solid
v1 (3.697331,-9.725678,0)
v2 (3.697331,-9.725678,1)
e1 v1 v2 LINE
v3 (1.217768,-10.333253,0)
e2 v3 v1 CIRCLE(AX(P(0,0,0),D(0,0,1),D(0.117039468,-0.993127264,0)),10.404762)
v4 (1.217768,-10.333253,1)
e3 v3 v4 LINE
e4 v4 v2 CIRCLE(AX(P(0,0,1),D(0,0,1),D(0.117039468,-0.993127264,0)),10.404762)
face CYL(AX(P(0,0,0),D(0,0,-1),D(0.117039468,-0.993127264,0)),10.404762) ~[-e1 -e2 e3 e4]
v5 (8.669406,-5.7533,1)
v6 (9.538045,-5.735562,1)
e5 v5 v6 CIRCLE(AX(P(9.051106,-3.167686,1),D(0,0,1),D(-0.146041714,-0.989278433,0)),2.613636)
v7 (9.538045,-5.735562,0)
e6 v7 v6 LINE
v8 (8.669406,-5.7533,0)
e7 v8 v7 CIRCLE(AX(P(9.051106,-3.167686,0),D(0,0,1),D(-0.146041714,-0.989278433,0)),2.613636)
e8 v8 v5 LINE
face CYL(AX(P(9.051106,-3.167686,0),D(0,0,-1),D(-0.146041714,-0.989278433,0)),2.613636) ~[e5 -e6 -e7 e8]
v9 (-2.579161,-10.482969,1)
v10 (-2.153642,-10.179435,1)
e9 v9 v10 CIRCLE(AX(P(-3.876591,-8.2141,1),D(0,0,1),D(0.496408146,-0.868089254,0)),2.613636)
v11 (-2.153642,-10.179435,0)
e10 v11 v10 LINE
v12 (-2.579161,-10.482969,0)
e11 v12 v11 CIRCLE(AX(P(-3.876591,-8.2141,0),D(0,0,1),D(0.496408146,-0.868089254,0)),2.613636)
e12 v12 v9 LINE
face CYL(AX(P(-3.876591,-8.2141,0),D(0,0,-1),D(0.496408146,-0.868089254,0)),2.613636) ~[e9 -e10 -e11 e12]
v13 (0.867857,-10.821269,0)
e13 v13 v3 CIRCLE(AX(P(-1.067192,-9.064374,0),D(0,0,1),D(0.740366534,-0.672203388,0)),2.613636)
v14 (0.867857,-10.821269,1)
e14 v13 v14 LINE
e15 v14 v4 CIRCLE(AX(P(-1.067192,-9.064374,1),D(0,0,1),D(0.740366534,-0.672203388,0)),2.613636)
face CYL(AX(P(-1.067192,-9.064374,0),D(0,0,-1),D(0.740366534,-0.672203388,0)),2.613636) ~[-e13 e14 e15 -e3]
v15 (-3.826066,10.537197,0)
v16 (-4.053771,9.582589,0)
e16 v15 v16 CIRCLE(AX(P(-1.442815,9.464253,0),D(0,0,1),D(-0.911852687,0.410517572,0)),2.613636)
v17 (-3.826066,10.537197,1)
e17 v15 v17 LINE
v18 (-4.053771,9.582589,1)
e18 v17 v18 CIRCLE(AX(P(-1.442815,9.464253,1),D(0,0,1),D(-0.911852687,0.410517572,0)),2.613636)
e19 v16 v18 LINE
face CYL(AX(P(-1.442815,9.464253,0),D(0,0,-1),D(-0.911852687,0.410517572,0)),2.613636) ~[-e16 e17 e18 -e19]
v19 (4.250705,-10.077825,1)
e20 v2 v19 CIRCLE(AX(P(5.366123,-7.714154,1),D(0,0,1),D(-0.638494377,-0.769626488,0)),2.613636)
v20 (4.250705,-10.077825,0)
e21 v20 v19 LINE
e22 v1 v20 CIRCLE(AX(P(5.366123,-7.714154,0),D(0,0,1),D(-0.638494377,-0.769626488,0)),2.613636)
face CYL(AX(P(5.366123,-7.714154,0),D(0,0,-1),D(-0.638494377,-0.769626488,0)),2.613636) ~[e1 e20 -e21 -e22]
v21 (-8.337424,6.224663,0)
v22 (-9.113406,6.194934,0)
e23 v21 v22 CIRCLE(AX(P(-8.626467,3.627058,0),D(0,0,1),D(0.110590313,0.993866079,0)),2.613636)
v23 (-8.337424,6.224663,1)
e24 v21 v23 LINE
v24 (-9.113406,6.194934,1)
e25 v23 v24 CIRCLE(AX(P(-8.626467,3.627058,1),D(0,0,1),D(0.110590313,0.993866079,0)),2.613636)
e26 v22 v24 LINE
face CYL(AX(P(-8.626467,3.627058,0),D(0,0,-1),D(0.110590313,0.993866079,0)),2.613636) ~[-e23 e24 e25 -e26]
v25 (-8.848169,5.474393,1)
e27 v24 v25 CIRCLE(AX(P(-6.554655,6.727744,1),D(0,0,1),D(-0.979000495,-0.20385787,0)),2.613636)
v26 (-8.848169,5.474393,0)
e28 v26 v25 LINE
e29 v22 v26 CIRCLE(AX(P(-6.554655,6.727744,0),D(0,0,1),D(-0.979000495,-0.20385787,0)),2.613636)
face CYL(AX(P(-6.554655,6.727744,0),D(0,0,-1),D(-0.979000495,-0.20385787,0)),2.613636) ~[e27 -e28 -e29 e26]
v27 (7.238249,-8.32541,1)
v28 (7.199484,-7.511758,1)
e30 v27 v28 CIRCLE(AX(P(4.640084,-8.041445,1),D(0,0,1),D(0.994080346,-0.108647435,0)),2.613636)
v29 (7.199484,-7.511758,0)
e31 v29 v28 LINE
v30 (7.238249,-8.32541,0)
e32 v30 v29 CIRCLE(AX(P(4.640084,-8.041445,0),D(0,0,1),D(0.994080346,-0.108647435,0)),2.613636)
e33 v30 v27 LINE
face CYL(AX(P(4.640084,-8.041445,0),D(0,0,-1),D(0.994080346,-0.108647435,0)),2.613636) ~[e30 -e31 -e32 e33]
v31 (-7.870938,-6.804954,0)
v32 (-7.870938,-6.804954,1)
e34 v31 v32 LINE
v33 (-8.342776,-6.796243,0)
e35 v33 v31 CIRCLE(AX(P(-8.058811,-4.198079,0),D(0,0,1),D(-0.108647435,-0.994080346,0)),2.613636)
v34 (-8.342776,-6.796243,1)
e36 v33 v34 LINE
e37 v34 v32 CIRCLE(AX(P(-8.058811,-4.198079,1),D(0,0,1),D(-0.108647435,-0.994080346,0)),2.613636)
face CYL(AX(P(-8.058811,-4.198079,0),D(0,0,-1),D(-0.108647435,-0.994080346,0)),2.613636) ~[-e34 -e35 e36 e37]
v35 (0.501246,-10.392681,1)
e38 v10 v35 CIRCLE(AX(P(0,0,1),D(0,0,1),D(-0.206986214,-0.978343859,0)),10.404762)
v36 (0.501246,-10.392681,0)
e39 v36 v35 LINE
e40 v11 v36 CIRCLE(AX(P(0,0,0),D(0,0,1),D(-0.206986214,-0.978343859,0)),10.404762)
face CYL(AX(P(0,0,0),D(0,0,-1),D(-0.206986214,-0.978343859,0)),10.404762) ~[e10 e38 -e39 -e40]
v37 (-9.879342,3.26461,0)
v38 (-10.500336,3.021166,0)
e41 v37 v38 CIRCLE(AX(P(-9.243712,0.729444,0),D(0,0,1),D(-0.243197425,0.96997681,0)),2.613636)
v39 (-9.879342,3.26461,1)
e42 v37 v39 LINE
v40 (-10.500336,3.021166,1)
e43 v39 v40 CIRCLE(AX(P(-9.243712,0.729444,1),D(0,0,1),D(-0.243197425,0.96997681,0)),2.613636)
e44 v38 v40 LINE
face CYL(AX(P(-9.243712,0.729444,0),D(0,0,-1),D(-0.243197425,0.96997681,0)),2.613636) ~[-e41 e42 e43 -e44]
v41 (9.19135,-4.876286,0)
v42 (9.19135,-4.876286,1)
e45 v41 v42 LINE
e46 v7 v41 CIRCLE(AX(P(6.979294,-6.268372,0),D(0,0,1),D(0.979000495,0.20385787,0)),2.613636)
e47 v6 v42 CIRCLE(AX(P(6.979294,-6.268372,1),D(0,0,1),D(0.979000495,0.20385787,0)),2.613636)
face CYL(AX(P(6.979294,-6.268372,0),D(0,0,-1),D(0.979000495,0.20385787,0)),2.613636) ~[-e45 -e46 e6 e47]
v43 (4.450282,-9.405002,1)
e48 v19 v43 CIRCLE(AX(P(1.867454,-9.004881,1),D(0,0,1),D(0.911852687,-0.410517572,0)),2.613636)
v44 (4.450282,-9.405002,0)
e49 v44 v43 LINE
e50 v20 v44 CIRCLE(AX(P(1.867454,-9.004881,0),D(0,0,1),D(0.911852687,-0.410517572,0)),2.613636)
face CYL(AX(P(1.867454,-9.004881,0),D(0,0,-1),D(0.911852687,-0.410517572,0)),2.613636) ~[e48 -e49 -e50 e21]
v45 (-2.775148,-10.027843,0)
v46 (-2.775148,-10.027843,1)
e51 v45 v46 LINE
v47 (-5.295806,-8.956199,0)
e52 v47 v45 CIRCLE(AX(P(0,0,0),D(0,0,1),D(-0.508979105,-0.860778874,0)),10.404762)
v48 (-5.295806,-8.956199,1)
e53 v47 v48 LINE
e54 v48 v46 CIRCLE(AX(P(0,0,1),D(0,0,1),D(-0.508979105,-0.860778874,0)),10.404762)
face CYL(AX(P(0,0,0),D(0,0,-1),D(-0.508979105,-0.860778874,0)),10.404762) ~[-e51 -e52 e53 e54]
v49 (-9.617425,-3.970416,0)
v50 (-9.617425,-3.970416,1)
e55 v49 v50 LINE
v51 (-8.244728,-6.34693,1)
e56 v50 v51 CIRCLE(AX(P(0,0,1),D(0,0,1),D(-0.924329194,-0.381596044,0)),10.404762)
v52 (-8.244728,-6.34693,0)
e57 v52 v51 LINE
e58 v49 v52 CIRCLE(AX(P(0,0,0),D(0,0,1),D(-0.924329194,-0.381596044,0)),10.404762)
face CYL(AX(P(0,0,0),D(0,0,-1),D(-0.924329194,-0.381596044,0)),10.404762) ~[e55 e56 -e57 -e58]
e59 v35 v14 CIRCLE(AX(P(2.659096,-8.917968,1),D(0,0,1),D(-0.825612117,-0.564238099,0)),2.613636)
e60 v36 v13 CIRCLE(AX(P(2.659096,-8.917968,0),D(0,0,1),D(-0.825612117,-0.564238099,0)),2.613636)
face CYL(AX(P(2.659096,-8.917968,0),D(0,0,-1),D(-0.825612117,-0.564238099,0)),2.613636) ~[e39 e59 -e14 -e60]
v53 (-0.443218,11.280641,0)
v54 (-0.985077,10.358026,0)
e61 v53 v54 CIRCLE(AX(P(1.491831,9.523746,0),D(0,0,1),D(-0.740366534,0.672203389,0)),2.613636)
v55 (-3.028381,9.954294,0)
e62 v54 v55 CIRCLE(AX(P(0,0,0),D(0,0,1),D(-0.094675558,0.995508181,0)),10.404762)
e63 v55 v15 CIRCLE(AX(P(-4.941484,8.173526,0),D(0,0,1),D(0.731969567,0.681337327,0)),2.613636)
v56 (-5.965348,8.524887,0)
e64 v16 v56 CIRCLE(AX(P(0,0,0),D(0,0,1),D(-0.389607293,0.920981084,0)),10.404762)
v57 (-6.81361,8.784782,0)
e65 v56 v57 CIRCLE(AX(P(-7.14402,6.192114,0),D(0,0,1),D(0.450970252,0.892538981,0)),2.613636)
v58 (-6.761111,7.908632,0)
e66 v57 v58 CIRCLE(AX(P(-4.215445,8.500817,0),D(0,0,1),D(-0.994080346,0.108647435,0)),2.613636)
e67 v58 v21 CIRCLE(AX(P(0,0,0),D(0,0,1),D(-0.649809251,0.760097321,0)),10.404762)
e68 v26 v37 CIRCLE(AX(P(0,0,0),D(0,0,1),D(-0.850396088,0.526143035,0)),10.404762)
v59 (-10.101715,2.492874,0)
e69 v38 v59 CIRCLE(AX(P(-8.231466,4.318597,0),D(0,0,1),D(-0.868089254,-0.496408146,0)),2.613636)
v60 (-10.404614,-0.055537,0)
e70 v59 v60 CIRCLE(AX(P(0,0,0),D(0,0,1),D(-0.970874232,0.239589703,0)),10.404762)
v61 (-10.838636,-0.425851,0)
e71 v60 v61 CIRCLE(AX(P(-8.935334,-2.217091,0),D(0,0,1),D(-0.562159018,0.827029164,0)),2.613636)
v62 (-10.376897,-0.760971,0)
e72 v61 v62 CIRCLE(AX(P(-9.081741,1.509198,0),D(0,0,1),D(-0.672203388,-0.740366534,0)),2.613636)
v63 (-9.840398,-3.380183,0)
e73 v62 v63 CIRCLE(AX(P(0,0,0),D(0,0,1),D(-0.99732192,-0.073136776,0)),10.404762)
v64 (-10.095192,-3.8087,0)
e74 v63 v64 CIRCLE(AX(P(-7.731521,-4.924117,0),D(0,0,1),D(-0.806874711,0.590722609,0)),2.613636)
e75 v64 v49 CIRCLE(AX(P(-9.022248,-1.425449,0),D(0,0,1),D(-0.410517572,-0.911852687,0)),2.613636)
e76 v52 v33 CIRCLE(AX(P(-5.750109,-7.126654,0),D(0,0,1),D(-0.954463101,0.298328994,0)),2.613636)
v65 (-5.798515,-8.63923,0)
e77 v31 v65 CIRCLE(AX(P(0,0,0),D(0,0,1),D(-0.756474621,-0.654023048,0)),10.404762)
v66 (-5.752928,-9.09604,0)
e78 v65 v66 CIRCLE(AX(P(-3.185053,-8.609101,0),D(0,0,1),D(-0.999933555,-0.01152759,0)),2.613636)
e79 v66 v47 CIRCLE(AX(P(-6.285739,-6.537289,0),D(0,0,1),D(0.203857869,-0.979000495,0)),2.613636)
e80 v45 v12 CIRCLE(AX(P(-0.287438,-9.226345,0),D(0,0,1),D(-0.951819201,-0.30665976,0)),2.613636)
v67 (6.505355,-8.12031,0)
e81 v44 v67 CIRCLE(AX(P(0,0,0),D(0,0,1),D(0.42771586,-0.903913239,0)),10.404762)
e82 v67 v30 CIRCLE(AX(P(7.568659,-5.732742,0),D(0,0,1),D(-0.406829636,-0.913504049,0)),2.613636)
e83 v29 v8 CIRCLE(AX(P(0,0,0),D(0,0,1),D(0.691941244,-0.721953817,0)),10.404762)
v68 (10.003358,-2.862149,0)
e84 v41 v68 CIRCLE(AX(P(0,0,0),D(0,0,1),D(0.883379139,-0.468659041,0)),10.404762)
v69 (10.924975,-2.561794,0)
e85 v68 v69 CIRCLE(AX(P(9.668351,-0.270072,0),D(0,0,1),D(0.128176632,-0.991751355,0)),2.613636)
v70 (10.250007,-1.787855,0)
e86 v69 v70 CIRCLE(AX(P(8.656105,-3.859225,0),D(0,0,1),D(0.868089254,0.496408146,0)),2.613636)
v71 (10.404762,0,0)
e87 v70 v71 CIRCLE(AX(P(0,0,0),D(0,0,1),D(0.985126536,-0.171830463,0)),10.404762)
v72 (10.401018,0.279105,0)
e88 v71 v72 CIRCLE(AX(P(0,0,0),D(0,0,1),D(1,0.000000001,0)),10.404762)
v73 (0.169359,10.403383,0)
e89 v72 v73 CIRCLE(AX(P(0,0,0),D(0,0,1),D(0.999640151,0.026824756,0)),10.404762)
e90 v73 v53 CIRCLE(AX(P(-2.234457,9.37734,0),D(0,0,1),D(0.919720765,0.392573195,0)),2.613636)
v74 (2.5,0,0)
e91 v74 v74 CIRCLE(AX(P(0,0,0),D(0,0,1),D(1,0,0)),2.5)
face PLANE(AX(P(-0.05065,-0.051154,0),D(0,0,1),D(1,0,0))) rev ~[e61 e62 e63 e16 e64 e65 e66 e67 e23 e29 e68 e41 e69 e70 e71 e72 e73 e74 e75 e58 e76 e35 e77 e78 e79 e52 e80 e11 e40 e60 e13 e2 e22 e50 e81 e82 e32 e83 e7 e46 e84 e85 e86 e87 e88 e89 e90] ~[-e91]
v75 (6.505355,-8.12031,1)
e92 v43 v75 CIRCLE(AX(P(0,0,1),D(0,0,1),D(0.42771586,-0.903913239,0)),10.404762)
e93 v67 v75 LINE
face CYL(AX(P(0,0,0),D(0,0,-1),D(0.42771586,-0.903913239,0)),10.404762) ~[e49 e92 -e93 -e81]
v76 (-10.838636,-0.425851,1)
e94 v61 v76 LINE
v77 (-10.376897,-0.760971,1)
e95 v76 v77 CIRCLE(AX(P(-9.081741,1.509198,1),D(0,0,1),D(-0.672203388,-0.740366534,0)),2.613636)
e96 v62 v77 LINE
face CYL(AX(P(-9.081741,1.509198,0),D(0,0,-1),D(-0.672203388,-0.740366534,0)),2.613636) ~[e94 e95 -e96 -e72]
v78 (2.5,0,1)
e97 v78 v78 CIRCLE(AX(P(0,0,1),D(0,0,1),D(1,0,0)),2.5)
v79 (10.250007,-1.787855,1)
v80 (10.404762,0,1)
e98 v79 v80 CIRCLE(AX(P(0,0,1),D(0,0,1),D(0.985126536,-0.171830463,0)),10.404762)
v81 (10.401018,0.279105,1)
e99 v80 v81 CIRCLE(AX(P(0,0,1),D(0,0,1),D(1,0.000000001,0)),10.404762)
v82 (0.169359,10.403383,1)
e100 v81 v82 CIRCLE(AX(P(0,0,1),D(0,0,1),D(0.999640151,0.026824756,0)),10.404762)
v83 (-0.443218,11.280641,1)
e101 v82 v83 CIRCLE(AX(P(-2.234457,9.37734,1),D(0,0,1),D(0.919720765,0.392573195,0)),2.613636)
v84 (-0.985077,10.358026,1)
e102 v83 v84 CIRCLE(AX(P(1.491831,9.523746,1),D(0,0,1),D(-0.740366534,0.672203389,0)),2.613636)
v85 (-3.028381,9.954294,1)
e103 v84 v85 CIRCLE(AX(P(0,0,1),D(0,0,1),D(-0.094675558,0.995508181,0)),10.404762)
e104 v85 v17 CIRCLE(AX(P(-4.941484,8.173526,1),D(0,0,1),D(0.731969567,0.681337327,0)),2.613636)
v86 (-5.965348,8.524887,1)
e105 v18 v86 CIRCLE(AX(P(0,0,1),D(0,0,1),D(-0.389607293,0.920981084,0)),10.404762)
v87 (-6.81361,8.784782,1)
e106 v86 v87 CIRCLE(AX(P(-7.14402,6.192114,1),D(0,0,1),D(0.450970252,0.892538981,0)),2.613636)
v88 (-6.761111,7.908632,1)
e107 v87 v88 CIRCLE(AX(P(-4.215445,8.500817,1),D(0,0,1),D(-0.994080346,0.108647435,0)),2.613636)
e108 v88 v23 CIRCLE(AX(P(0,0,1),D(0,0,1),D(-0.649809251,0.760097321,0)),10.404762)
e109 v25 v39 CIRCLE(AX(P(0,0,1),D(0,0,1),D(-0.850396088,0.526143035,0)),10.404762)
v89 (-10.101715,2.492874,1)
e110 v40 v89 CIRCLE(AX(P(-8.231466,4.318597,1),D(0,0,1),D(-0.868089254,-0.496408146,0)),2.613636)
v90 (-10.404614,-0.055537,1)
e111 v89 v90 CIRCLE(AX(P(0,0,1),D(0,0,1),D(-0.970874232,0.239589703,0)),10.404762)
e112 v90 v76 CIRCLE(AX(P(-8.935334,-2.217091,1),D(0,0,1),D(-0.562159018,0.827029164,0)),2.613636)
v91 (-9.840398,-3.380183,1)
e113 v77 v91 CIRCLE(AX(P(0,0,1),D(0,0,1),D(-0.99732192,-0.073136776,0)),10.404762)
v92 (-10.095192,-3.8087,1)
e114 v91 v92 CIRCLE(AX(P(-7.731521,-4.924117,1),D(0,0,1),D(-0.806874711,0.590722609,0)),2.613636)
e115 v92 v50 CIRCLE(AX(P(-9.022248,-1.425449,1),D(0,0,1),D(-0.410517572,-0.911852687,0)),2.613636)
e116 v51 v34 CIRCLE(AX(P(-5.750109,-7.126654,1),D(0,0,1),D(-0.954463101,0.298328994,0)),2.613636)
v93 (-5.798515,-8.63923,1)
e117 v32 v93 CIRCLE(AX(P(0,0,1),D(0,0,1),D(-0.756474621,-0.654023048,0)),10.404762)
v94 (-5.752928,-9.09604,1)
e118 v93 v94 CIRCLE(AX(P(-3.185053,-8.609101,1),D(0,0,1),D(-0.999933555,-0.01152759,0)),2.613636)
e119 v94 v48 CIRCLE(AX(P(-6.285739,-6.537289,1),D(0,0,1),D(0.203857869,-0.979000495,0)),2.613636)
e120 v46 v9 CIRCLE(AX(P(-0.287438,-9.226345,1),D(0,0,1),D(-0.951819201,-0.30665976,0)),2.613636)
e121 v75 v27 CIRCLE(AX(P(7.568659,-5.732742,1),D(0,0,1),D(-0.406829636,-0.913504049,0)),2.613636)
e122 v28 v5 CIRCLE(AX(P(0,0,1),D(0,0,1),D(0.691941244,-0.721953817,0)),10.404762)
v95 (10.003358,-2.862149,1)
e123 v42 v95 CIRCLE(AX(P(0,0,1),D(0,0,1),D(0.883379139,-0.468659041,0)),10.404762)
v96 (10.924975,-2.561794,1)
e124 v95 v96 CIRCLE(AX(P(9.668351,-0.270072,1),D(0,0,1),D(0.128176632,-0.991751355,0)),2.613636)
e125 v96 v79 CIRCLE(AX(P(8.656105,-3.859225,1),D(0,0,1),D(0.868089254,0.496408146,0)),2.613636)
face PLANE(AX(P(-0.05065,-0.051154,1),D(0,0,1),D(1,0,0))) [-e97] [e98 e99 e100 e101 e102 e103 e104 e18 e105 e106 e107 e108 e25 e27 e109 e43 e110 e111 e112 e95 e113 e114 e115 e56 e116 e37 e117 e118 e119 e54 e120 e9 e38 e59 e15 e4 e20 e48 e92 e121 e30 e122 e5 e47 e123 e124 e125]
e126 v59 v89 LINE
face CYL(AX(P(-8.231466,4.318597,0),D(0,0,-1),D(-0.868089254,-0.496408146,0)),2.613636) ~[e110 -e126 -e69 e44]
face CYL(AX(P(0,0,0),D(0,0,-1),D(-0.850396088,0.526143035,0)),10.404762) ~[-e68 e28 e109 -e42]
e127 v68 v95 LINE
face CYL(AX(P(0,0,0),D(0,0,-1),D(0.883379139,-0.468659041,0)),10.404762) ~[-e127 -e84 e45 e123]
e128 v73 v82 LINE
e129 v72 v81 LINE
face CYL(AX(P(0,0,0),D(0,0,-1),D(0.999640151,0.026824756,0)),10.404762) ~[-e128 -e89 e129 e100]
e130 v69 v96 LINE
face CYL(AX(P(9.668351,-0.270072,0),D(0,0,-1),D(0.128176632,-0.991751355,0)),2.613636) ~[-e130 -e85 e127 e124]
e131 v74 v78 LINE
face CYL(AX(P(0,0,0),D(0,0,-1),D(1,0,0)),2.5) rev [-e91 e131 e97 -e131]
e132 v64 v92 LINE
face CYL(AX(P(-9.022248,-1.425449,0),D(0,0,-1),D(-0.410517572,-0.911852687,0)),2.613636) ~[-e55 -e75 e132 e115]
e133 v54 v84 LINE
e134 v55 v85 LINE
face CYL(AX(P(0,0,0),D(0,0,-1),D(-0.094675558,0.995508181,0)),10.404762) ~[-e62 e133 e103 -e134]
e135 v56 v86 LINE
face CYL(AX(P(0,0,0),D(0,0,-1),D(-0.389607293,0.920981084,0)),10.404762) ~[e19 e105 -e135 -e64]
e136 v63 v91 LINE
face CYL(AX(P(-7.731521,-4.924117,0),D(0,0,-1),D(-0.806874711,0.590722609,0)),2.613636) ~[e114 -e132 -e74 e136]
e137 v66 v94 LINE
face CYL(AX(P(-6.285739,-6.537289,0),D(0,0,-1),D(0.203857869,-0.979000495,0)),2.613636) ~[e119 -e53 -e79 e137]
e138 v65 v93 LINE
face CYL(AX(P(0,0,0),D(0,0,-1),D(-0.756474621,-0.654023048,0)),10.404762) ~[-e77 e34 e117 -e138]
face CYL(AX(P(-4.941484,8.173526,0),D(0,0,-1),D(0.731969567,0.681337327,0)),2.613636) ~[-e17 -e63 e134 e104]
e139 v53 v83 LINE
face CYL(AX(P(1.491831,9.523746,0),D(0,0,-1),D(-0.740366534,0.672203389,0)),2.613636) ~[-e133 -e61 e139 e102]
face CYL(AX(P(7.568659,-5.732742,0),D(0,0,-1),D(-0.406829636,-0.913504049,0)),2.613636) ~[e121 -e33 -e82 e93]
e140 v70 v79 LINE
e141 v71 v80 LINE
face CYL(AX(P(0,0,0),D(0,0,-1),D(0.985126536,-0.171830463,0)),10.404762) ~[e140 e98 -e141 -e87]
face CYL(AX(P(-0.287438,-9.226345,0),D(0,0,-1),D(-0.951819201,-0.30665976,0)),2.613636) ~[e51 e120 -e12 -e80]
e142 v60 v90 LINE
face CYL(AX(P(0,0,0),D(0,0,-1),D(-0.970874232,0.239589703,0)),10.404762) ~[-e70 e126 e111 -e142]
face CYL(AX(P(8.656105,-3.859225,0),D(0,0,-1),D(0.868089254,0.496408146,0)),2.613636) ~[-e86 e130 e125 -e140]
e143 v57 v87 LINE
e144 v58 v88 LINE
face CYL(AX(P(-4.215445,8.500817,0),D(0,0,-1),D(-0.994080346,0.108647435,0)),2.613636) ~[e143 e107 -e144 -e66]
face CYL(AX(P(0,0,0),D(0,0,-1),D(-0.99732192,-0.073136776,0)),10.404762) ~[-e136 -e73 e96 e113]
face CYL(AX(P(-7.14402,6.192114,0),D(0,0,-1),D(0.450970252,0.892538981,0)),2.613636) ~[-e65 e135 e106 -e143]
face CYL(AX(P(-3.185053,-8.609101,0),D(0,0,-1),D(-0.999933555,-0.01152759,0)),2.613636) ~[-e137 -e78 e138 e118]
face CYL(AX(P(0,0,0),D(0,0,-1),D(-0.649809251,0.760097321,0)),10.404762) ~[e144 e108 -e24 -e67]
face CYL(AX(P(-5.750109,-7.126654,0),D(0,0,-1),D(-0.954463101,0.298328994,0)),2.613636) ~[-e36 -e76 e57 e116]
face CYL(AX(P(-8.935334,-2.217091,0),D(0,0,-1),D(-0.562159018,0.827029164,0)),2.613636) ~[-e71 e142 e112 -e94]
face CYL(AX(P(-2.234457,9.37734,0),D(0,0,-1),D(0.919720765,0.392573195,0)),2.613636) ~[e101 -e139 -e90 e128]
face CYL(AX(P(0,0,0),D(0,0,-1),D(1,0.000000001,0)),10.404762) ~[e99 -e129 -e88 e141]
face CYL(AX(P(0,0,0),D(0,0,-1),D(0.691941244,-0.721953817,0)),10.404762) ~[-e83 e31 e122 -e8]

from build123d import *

# Parameters (mm, degrees)
F1_R     = 2.5
F2_DEPTH = 1


with BuildPart() as f2:
    # F1 (on Top) → F2 (new body)
    with BuildSketch(Plane.XY):
        with BuildLine():
            ThreePointArc((10.4010177666, 0.2791052033), (7.3183650566, 7.3959856133), (0.1693586543, 10.4033834852))
            ThreePointArc((0.1693586543, 10.4033834852), (-0.4084890354, 10.3967402104), (-0.9850766389, 10.358025599))
            ThreePointArc((-0.9850766389, 10.358025599), (-2.0168567686, 10.2074168657), (-3.0283814682, 9.9542943486))
            ThreePointArc((-3.0283814682, 9.9542943486), (-3.5459501656, 9.7818867156), (-4.0537711259, 9.5825888962))
            ThreePointArc((-4.0537711259, 9.5825888962), (-5.0373972408, 9.1040485134), (-5.9653480877, 8.5248866554))
            ThreePointArc((-5.9653480877, 8.5248866554), (-6.3706851973, 8.2263868382), (-6.7611105438, 7.9086316458))
            ThreePointArc((-6.7611105438, 7.9086316458), (-7.5960763624, 7.1104637114), (-8.3374242637, 6.2246627975))
            ThreePointArc((-8.3374242637, 6.2246627975), (-8.6009812596, 5.8550996291), (-8.8481688232, 5.4743930047))
            ThreePointArc((-8.8481688232, 5.4743930047), (-9.4287165512, 4.3998152793), (-9.8793415326, 3.2646104174))
            ThreePointArc((-9.8793415326, 3.2646104174), (-9.9979773753, 2.8808885258), (-10.1017152215, 2.4928738192))
            ThreePointArc((-10.1017152215, 2.4928738192), (-10.3320366233, 1.228042959), (-10.4046136849, -0.0555370437))
            ThreePointArc((-10.4046136849, -0.0555370437), (-10.3967402104, -0.4084890354), (-10.3768971195, -0.7609707396))
            ThreePointArc((-10.3768971195, -0.7609707396), (-10.193126284, -2.0878809482), (-9.8403979466, -3.3801832122))
            ThreePointArc((-9.8403979466, -3.3801832122), (-9.7333865621, -3.676990118), (-9.6174251884, -3.9704159783))
            ThreePointArc((-9.6174251884, -3.9704159783), (-9.0097773066, -5.204131357), (-8.2447283135, -6.3469303865))
            ThreePointArc((-8.2447283135, -6.3469303865), (-8.061087037, -6.5785975768), (-7.8709383234, -6.8049540927))
            ThreePointArc((-7.8709383234, -6.8049540927), (-6.8959867768, -7.7913051967), (-5.7985154997, -8.6392296123))
            ThreePointArc((-5.7985154997, -8.6392296123), (-5.549424479, -8.8013043491), (-5.2958064015, -8.9561992414))
            ThreePointArc((-5.2958064015, -8.9561992414), (-4.0708941637, -9.5753272008), (-2.7751475554, -10.0278425566))
            ThreePointArc((-2.7751475554, -10.0278425566), (-2.4655602512, -10.1084164409), (-2.1536422724, -10.1794349184))
            ThreePointArc((-2.1536422724, -10.1794349184), (-0.8330496502, -10.3713595336), (0.5012461634, -10.3926812026))
            ThreePointArc((0.5012461634, -10.3926812026), (0.8600204589, -10.3691578783), (1.2177678025, -10.3332527248))
            ThreePointArc((1.2177678025, -10.3332527248), (2.476254211, -10.105802065), (3.6973306562, -9.725678193))
            ThreePointArc((3.6973306562, -9.725678193), (4.0769602691, -9.5727459623), (4.4502816898, -9.4050020296))
            ThreePointArc((4.4502816898, -9.4050020296), (5.5153513374, -8.8226962954), (6.5053546396, -8.1203098037))
            ThreePointArc((6.5053546396, -8.1203098037), (6.8591715093, -7.823735457), (7.1994838987, -7.5117575764))
            ThreePointArc((7.1994838987, -7.5117575764), (7.983010793, -6.6731258772), (8.6694062261, -5.7533004425))
            ThreePointArc((8.6694062261, -5.7533004425), (8.9411374277, -5.3211964626), (9.1913496147, -4.8762857335))
            ThreePointArc((9.1913496147, -4.8762857335), (9.6500459533, -3.8904605631), (10.0033580362, -2.8621492438))
            ThreePointArc((10.0033580362, -2.8621492438), (10.1409184183, -2.3282705875), (10.2500070535, -1.7878550549))
            ThreePointArc((10.2500070535, -1.7878550549), (10.3660009938, -0.8972701323), (10.4047619048, 0))
            ThreePointArc((10.4047619048, 0), (10.4038258281, 0.1395651578), (10.4010177666, 0.2791052033))
        make_face()
        Circle(F1_R, mode=Mode.SUBTRACT)
        with BuildLine():
            ThreePointArc((-0.9850766389, 10.358025599), (-0.4084890354, 10.3967402104), (0.1693586543, 10.4033834852))
            ThreePointArc((0.1693586543, 10.4033834852), (-0.0915577789, 10.8736948256), (-0.4432176074, 11.280641391))
            ThreePointArc((-0.4432176074, 11.280641391), (-0.7618647264, 10.8473583939), (-0.9850766389, 10.358025599))
        make_face()
        with BuildLine():
            ThreePointArc((-4.0537711259, 9.5825888962), (-3.5459501656, 9.7818867156), (-3.0283814682, 9.9542943486))
            ThreePointArc((-3.0283814682, 9.9542943486), (-3.3994309889, 10.2837794802), (-3.8260663696, 10.5371970223))
            ThreePointArc((-3.8260663696, 10.5371970223), (-3.9851262119, 10.0706763942), (-4.0537711259, 9.5825888962))
        make_face()
        with BuildLine():
            ThreePointArc((10.9249748031, -2.5617942214), (10.6258758179, -2.1413484121), (10.2500070535, -1.7878550549))
            ThreePointArc((10.2500070535, -1.7878550549), (10.1409184183, -2.3282705875), (10.0033580362, -2.8621492438))
            ThreePointArc((10.0033580362, -2.8621492438), (10.4782123863, -2.7550707236), (10.9249748031, -2.5617942214))
        make_face()
        with BuildLine():
            ThreePointArc((-6.7611105438, 7.9086316458), (-6.3706851973, 8.2263868382), (-5.9653480877, 8.5248866554))
            ThreePointArc((-5.9653480877, 8.5248866554), (-6.3783708882, 8.691089302), (-6.8136097843, 8.784781654))
            ThreePointArc((-6.8136097843, 8.784781654), (-6.8244021361, 8.3444870809), (-6.7611105438, 7.9086316458))
        make_face()
        with BuildLine():
            ThreePointArc((9.5380453186, -5.7355619953), (9.4030800104, -5.2904375026), (9.1913496147, -4.8762857335))
            ThreePointArc((9.1913496147, -4.8762857335), (8.9411374277, -5.3211964626), (8.6694062261, -5.7533004425))
            ThreePointArc((8.6694062261, -5.7533004425), (9.1044680071, -5.7807779267), (9.5380453186, -5.7355619953))
        make_face()
        with BuildLine():
            ThreePointArc((-8.8481688232, 5.4743930047), (-8.6009812596, 5.8550996291), (-8.3374242637, 6.2246627975))
            ThreePointArc((-8.3374242637, 6.2246627975), (-8.7265255483, 6.2387786553), (-9.1134062865, 6.1949339122))
            ThreePointArc((-9.1134062865, 6.1949339122), (-9.0073910178, 5.8248704891), (-8.8481688232, 5.4743930047))
        make_face()
        with BuildLine():
            ThreePointArc((7.2382488163, -8.3254097371), (7.2507593771, -7.9170641742), (7.1994838987, -7.5117575764))
            ThreePointArc((7.1994838987, -7.5117575764), (6.8591715093, -7.823735457), (6.5053546396, -8.1203098037))
            ThreePointArc((6.5053546396, -8.1203098037), (6.8642964884, -8.2496786303), (7.2382488163, -8.3254097371))
        make_face()
        with BuildLine():
            ThreePointArc((-10.1017152215, 2.4928738192), (-9.9979773753, 2.8808885258), (-9.8793415326, 3.2646104174))
            ThreePointArc((-9.8793415326, 3.2646104174), (-10.1976364828, 3.162779516), (-10.500335771, 3.0211661383))
            ThreePointArc((-10.500335771, 3.0211661383), (-10.3178144144, 2.7443519774), (-10.1017152215, 2.4928738192))
        make_face()
        with BuildLine():
            ThreePointArc((4.2507054017, -10.0778251054), (4.373179067, -9.7481426651), (4.4502816898, -9.4050020296))
            ThreePointArc((4.4502816898, -9.4050020296), (4.0769602691, -9.5727459623), (3.6973306562, -9.725678193))
            ThreePointArc((3.6973306562, -9.725678193), (3.9629273196, -9.919179939), (4.2507054017, -10.0778251054))
        make_face()
        with BuildLine():
            ThreePointArc((-10.3768971195, -0.7609707396), (-10.3967402104, -0.4084890354), (-10.4046136849, -0.0555370437))
            ThreePointArc((-10.4046136849, -0.0555370437), (-10.6317595983, -0.2288157362), (-10.8386359166, -0.425851165))
            ThreePointArc((-10.8386359166, -0.425851165), (-10.6169381073, -0.6060478704), (-10.3768971195, -0.7609707396))
        make_face()
        with BuildLine():
            ThreePointArc((0.8678566395, -10.8212694742), (1.0568743578, -10.5873437424), (1.2177678025, -10.3332527248))
            ThreePointArc((1.2177678025, -10.3332527248), (0.8600204589, -10.3691578783), (0.5012461634, -10.3926812026))
            ThreePointArc((0.5012461634, -10.3926812026), (0.6729569444, -10.6168931305), (0.8678566395, -10.8212694742))
        make_face()
        with BuildLine():
            ThreePointArc((-9.6174251884, -3.9704159783), (-9.7333865621, -3.676990118), (-9.8403979466, -3.3801832122))
            ThreePointArc((-9.8403979466, -3.3801832122), (-9.978035392, -3.5883525406), (-10.0951915478, -3.8086999272))
            ThreePointArc((-10.0951915478, -3.8086999272), (-9.8602185944, -3.901110143), (-9.6174251884, -3.9704159783))
        make_face()
        with BuildLine():
            ThreePointArc((-2.5791606638, -10.4829693286), (-2.3587946678, -10.341865934), (-2.1536422724, -10.1794349184))
            ThreePointArc((-2.1536422724, -10.1794349184), (-2.4655602512, -10.1084164409), (-2.7751475554, -10.0278425566))
            ThreePointArc((-2.7751475554, -10.0278425566), (-2.6879646474, -10.2600611812), (-2.5791606638, -10.4829693286))
        make_face()
        with BuildLine():
            ThreePointArc((-7.8709383234, -6.8049540927), (-8.061087037, -6.5785975768), (-8.2447283135, -6.3469303865))
            ThreePointArc((-8.2447283135, -6.3469303865), (-8.3036538881, -6.5694261546), (-8.3427761795, -6.7962433419))
            ThreePointArc((-8.3427761795, -6.7962433419), (-8.1070542554, -6.8112698876), (-7.8709383234, -6.8049540927))
        make_face()
        with BuildLine():
            ThreePointArc((-5.7529284377, -9.0960398441), (-5.5211636058, -9.036592423), (-5.2958064015, -8.9561992414))
            ThreePointArc((-5.2958064015, -8.9561992414), (-5.549424479, -8.8013043491), (-5.7985154997, -8.6392296123))
            ThreePointArc((-5.7985154997, -8.6392296123), (-5.7857710928, -8.8686375736), (-5.7529284377, -9.0960398441))
        make_face()
    extrude(amount=F2_DEPTH)


solid = f2.part
